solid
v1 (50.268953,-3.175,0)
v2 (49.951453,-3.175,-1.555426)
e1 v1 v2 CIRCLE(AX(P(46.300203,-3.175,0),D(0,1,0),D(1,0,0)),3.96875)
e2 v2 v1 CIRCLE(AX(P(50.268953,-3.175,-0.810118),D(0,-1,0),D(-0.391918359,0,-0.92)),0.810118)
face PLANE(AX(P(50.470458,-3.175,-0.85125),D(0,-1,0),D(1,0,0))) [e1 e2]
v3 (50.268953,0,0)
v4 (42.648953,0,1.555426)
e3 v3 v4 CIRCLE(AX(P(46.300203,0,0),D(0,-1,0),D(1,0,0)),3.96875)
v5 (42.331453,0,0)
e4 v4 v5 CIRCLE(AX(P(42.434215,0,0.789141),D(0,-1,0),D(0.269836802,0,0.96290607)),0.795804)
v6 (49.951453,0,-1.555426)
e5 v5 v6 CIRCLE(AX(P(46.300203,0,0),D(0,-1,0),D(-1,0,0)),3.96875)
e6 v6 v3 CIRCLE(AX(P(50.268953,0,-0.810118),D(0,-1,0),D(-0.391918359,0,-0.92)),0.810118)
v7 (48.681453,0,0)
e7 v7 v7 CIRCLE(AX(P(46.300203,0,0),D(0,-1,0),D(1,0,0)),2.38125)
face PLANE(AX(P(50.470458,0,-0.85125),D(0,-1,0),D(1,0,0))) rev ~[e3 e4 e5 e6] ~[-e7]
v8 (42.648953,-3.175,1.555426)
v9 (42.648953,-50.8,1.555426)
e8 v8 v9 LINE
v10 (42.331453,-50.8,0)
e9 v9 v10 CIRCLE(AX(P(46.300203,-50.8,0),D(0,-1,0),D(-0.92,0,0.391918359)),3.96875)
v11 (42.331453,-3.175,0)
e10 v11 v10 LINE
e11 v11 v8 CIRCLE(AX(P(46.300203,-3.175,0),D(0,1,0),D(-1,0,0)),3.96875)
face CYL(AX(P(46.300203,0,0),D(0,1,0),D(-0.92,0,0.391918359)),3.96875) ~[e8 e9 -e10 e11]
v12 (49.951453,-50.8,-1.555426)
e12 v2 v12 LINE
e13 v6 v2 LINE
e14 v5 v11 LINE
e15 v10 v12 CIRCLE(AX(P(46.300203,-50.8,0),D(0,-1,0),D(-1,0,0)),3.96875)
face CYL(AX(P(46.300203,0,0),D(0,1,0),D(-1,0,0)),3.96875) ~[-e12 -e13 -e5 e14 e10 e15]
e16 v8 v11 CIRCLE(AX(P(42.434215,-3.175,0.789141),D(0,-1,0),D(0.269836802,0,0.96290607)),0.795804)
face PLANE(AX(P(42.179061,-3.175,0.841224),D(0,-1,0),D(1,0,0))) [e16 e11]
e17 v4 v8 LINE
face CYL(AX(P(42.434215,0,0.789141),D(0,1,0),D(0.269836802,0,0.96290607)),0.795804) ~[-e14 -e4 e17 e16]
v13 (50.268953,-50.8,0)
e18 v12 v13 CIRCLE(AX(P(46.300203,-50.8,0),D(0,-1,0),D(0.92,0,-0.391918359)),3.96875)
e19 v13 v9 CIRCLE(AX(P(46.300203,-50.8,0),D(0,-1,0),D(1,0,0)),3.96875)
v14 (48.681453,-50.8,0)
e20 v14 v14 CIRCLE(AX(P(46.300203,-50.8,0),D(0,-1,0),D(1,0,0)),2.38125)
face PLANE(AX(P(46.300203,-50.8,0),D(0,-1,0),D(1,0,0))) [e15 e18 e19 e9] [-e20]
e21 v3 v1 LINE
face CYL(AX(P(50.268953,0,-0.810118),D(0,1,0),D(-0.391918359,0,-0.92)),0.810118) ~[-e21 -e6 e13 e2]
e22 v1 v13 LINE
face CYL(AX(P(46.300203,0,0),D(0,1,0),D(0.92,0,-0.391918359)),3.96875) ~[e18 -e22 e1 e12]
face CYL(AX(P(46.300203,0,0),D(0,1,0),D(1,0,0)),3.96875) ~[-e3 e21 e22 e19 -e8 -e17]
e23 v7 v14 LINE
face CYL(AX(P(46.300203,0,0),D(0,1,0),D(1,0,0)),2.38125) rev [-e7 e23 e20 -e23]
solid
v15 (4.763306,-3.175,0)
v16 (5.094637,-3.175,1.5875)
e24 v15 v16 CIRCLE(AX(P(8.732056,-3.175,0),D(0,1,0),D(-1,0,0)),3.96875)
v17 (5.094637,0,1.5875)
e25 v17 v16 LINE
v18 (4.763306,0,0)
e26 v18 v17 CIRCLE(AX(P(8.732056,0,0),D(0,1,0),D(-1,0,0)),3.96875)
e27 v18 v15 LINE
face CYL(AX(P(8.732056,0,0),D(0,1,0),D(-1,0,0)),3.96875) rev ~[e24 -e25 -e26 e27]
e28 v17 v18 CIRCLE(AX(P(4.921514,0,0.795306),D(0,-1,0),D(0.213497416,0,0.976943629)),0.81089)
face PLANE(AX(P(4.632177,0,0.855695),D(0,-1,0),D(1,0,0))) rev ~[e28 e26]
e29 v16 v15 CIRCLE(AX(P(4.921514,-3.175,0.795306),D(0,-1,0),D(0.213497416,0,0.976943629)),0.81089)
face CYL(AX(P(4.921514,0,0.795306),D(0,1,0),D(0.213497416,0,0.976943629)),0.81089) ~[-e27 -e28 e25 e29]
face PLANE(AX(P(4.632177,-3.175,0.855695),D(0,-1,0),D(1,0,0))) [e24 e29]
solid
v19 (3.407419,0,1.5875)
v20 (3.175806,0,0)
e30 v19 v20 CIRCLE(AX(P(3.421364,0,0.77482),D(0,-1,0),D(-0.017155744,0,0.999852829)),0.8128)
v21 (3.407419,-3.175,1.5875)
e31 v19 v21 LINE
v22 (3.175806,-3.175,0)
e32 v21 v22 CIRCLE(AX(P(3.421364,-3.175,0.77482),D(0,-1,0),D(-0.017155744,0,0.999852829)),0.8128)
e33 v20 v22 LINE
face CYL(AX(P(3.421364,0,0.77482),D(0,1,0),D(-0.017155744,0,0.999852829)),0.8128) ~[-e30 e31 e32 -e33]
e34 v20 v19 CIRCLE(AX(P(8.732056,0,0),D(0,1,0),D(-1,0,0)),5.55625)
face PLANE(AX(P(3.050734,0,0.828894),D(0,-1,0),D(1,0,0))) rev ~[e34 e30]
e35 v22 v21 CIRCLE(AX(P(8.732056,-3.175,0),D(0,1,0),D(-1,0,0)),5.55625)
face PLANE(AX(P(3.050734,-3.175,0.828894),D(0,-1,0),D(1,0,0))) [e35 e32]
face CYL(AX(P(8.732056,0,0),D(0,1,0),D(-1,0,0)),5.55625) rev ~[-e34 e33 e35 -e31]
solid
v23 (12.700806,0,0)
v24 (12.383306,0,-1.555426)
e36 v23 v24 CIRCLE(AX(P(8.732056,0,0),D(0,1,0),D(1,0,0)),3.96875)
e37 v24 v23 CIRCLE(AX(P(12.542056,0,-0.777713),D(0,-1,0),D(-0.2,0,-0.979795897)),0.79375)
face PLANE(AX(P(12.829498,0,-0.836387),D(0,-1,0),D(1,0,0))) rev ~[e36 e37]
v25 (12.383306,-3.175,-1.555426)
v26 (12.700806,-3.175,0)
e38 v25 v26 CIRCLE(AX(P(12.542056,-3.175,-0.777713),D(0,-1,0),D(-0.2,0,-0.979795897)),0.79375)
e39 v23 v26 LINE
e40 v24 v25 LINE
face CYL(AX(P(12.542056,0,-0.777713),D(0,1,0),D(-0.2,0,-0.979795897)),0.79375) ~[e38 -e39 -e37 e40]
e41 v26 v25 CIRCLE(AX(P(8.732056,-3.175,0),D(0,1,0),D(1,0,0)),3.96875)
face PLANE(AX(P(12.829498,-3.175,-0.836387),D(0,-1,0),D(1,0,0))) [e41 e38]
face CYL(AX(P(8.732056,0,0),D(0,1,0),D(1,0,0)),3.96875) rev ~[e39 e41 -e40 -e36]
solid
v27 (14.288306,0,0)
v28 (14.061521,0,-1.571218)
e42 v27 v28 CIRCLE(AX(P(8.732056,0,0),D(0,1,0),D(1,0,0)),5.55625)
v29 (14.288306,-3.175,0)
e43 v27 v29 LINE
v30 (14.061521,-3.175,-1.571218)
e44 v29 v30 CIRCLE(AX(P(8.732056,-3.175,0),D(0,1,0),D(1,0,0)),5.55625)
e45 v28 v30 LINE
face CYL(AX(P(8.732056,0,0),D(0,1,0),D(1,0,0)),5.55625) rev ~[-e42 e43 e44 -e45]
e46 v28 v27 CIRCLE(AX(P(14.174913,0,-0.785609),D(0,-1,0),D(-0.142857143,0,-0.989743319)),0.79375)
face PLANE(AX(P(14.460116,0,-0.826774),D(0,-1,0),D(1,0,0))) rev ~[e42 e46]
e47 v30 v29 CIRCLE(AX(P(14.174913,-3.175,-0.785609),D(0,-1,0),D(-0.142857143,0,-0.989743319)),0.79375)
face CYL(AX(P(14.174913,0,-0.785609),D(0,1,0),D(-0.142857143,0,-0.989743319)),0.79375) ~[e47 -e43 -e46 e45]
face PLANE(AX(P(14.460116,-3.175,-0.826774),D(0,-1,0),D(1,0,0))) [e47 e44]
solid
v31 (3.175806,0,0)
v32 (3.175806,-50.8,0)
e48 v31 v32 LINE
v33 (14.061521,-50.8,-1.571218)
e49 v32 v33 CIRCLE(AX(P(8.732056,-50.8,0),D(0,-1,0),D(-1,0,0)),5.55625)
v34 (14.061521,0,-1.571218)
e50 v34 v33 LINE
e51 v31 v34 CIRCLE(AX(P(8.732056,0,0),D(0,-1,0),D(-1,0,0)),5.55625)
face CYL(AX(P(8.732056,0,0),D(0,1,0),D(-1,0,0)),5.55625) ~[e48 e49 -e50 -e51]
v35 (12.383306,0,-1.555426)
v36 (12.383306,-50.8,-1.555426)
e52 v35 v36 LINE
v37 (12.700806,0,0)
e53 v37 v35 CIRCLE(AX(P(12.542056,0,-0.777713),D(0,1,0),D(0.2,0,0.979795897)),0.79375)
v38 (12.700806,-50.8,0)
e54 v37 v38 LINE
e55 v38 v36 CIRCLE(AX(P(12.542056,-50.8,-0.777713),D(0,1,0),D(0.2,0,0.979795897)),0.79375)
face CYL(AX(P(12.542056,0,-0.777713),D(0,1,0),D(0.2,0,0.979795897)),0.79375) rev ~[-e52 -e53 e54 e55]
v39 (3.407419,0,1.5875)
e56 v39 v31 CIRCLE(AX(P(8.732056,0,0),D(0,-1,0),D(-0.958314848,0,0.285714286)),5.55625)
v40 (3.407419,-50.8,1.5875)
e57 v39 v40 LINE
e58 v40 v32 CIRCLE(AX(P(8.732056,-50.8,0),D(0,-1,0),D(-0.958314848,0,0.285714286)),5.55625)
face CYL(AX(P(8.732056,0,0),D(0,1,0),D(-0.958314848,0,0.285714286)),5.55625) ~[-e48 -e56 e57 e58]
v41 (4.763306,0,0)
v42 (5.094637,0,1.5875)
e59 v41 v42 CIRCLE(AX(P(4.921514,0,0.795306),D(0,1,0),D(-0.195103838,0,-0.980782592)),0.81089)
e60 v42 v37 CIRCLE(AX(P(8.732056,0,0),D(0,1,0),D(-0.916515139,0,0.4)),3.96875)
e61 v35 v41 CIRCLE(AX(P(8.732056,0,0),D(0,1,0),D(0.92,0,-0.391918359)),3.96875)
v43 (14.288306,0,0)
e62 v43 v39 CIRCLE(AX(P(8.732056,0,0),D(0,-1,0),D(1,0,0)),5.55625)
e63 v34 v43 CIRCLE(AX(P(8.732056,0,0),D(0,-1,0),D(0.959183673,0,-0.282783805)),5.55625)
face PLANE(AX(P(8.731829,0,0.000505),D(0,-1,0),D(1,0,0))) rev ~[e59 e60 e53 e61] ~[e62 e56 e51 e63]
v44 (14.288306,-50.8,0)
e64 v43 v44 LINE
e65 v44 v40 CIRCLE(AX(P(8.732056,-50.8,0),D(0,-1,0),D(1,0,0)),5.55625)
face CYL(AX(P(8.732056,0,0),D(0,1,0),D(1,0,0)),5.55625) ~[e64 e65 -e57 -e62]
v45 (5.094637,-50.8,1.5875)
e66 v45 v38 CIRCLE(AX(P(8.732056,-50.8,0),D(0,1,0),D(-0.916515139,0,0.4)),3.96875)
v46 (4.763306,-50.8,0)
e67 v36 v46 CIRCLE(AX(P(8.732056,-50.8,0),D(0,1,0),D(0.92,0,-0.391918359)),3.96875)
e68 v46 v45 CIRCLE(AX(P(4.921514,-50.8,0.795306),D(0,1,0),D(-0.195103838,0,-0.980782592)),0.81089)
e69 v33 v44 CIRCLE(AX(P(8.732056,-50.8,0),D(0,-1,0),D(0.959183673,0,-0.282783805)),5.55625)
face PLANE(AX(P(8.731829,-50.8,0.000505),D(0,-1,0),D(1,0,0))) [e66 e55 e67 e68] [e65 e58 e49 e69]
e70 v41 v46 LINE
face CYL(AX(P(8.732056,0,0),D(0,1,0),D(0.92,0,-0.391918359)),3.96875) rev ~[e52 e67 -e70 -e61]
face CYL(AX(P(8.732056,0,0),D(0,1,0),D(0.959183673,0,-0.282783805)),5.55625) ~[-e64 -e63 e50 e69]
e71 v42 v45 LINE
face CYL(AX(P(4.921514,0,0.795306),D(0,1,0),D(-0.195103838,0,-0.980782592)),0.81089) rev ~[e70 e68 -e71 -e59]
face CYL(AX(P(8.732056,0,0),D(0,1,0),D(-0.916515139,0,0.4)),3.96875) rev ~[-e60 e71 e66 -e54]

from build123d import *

# Parameters (mm, degrees)
F0_R     = 2.38125
F1_DEPTH = 50.8
F2_DEPTH = 3.175
F3_DEPTH = 3.175


# Not quite as in the source:
# - a feature names something its author has since deleted; it is built from what else it names


with BuildPart() as f1:
    # F0 (on Front) → F1 (new body)
    with BuildSketch(Plane.XZ):
        with BuildLine():
            ThreePointArc((49.9514526081, -1.5554259867), (50.1887675748, -0.79375), (50.2689526081, 0))
            ThreePointArc((50.2689526081, 0), (47.0939526081, 3.8885649667), (42.6489526081, 1.5554259867))
            ThreePointArc((42.6489526081, 1.5554259867), (42.4116376414, 0.79375), (42.3314526081, 0))
            ThreePointArc((42.3314526081, 0), (45.5064526081, -3.8885649667), (49.9514526081, -1.5554259867))
        make_face()
        with Locations((46.3002026081, 0)):
            Circle(F0_R, mode=Mode.SUBTRACT)
    extrude(amount=F1_DEPTH)

    # F0 (on Front) → F3 (join)
    with BuildSketch(Plane.XZ):
        with BuildLine():
            ThreePointArc((49.9514526081, -1.5554259867), (51.0627026081, -0.9721412417), (50.2689526081, 0))
            ThreePointArc((50.2689526081, 0), (50.1887675748, -0.79375), (49.9514526081, -1.5554259867))
        make_face()
        with BuildLine():
            ThreePointArc((42.3314526081, 0), (42.4116376414, 0.79375), (42.6489526081, 1.5554259867))
            ThreePointArc((42.6489526081, 1.5554259867), (41.654489723, 0.9483021717), (42.3314526081, 0))
        make_face()
    extrude(amount=F3_DEPTH)


with BuildPart() as f1b:
    # F0 (on Front) → F1, piece 2 (new body)
    with BuildSketch(Plane.XZ):
        with BuildLine():
            ThreePointArc((14.0615205309, -1.5712175183), (14.2313175592, -0.79375), (14.2883062452, 0))
            ThreePointArc((14.2883062452, 0), (9.534209736, 5.4980418187), (3.4074193738, 1.5875))
            ThreePointArc((3.4074193738, 1.5875), (3.2340144266, 0.8021534908), (3.1758062452, 0))
            ThreePointArc((3.1758062452, 0), (7.9383062452, -5.499261314), (14.0615205309, -1.5712175183))
        make_face()
        with BuildLine():
            ThreePointArc((5.0946367873, 1.5875), (9.5429101436, 3.8850344294), (12.7008062452, 0))
            ThreePointArc((12.7008062452, 0), (13.3197692385, -0.9364629933), (12.3833062452, -1.5554259867))
            ThreePointArc((12.3833062452, -1.5554259867), (7.9383062452, -3.8885649667), (4.7633062452, 0))
            ThreePointArc((4.7633062452, 0), (4.1277289023, 0.9609790707), (5.0946367873, 1.5875))
        make_face(mode=Mode.SUBTRACT)
    extrude(amount=F1_DEPTH)


with BuildPart() as f2:
    # F0 (on Front) → F2 (new body)
    with BuildSketch(Plane.XZ):
        with BuildLine():
            ThreePointArc((4.7633062452, 0), (4.8470218158, 0.8108538984), (5.0946367873, 1.5875))
            ThreePointArc((5.0946367873, 1.5875), (4.1277289023, 0.9609790707), (4.7633062452, 0))
        make_face()
    extrude(amount=F2_DEPTH)


with BuildPart() as f2b:
    # F0 (on Front) → F2, piece 2 (new body)
    with BuildSketch(Plane.XZ):
        with BuildLine():
            ThreePointArc((12.3833062452, -1.5554259867), (13.3197692385, -0.9364629933), (12.7008062452, 0))
            ThreePointArc((12.7008062452, 0), (12.6206212119, -0.79375), (12.3833062452, -1.5554259867))
        make_face()
    extrude(amount=F2_DEPTH)


with BuildPart() as f2c:
    # F0 (on Front) → F2, piece 3 (new body)
    with BuildSketch(Plane.XZ):
        with BuildLine():
            ThreePointArc((14.0615205309, -1.5712175183), (14.9605221472, -0.8990016163), (14.2883062452, 0))
            ThreePointArc((14.2883062452, 0), (14.2313175592, -0.79375), (14.0615205309, -1.5712175183))
        make_face()
    extrude(amount=F2_DEPTH)


with BuildPart() as f2d:
    # F0 (on Front) → F2, piece 4 (new body)
    with BuildSketch(Plane.XZ):
        with BuildLine():
            ThreePointArc((3.1758062452, 0), (3.2340144266, 0.8021534908), (3.4074193738, 1.5875))
            ThreePointArc((3.4074193738, 1.5875), (2.6170785878, 0.8921632166), (3.1758062452, 0))
        make_face()
    extrude(amount=F2_DEPTH)


solid = Compound([f1.part, f1b.part, f2.part, f2b.part, f2c.part, f2d.part])
